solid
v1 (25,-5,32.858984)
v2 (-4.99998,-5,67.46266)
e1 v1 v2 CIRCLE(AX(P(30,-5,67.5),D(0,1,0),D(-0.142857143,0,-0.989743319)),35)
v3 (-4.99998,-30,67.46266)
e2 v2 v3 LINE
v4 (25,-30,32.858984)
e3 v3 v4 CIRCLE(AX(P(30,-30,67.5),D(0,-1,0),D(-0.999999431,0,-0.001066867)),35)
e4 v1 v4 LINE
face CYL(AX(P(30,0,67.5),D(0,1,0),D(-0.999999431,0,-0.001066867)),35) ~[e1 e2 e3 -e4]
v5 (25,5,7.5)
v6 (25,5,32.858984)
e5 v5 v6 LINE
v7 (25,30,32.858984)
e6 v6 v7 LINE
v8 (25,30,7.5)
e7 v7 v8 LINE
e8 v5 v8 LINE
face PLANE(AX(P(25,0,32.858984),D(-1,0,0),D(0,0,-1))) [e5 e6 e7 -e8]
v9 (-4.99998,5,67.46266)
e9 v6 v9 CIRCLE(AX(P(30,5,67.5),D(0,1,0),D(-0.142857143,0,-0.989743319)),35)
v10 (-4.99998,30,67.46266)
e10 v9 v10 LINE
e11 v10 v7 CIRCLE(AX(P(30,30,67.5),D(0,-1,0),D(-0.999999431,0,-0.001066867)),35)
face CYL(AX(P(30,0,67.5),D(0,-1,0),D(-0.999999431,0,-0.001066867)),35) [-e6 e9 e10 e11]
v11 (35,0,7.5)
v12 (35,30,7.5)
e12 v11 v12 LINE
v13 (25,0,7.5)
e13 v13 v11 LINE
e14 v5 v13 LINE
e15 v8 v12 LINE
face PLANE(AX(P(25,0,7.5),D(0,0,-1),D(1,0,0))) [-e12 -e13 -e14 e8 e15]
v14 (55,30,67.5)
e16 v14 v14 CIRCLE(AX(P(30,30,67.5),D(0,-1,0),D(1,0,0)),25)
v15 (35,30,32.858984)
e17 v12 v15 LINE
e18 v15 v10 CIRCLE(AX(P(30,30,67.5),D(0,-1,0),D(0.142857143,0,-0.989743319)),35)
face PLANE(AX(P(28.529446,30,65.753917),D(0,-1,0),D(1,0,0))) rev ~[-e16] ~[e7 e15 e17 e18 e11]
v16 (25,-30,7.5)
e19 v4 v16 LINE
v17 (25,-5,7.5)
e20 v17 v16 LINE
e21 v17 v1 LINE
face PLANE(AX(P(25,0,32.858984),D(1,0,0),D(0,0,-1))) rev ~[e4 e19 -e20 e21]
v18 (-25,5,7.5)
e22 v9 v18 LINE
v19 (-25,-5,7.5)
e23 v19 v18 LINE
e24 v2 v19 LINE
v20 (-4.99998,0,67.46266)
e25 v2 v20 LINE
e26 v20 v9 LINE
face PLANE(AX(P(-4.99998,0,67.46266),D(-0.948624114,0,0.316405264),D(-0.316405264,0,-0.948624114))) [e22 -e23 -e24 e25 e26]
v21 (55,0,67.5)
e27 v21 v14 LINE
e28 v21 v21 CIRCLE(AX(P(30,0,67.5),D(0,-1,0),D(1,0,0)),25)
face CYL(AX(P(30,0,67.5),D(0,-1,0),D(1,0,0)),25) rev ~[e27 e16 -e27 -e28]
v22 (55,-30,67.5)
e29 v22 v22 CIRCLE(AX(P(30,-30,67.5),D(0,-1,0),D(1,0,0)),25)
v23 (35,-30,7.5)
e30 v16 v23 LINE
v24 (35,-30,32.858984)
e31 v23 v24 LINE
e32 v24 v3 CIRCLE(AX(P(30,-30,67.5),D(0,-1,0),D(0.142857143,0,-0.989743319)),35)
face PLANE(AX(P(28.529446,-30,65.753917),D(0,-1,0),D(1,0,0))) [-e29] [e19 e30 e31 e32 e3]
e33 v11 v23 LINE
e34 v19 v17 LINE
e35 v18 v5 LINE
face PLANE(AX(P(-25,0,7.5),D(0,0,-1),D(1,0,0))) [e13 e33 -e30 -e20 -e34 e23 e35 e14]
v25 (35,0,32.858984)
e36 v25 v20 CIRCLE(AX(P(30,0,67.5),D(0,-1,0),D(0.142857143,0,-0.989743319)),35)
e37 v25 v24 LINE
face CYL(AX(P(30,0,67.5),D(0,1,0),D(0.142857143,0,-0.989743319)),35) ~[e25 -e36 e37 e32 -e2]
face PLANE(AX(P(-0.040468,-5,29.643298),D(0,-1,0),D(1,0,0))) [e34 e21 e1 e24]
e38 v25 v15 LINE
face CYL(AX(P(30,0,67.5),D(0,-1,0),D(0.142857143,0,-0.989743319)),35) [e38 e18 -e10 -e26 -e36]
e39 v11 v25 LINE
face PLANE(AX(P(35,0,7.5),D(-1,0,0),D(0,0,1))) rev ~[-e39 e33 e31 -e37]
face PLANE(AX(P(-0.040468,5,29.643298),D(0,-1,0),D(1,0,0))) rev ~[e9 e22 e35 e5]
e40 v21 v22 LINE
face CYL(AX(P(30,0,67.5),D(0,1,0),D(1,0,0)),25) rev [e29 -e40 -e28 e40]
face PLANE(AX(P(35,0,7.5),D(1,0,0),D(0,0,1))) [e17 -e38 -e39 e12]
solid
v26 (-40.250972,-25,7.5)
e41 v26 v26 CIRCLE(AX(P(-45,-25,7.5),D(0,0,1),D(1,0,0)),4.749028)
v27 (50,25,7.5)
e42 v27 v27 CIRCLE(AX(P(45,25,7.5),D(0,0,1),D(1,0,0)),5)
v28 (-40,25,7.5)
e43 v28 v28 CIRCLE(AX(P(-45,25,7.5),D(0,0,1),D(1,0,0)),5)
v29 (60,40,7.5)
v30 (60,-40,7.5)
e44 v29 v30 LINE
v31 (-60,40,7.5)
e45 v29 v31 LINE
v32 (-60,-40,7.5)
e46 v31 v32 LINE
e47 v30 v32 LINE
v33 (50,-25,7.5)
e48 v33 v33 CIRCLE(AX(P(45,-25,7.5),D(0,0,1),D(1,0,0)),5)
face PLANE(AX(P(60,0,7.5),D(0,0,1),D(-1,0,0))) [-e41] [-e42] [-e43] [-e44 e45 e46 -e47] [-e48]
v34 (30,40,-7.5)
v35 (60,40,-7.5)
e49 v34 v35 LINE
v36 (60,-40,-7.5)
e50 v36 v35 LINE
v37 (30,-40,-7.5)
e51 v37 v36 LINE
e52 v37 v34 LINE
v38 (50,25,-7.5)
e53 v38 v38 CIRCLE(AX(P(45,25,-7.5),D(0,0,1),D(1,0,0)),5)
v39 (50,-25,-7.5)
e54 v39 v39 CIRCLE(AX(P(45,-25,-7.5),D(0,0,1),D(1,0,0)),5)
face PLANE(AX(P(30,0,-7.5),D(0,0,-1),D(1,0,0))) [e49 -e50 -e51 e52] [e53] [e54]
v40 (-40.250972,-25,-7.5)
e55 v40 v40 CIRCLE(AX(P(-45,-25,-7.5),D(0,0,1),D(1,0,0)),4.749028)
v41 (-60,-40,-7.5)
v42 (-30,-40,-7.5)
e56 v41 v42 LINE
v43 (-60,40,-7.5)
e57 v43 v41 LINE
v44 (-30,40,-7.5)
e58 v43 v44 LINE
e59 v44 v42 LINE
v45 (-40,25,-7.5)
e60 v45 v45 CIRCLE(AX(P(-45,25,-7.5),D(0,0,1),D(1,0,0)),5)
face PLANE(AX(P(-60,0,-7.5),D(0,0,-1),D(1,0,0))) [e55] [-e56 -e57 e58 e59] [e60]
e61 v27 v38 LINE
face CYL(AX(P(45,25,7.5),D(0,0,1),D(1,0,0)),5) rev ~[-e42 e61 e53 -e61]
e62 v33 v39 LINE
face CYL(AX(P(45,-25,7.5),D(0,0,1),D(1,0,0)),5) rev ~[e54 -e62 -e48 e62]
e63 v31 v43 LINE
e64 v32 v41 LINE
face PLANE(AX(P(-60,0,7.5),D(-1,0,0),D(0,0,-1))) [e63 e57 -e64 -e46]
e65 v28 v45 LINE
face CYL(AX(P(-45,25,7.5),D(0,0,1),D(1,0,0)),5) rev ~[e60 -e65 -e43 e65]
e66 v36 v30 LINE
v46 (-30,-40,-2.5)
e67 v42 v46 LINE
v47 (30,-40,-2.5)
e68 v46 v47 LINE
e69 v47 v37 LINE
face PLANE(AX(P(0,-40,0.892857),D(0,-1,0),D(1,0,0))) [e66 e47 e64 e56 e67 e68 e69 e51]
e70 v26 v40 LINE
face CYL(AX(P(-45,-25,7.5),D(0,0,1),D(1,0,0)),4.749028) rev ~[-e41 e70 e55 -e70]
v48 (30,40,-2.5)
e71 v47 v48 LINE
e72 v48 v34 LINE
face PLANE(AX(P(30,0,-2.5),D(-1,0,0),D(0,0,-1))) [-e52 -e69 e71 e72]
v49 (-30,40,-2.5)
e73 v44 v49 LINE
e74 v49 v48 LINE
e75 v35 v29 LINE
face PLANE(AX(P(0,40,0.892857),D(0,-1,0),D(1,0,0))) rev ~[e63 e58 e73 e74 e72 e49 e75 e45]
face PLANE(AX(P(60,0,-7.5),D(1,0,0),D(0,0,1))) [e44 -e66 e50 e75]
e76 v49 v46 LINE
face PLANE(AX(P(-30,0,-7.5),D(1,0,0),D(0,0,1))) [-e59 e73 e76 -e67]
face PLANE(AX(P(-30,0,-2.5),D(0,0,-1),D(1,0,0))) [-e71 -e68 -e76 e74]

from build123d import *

# Parameters (mm, degrees)
F1_DEPTH      = 40
F1_DEPTH_BACK = 40
F2_DEPTH      = 5
F2_DEPTH_BACK = 5
F0_R          = 25
F3_DEPTH      = 30
F3_DEPTH_BACK = 30
F4_R          = 5
F4_R_2        = 4.7490283211
F5_DEPTH      = 25
F6_R          = 5
F7_DEPTH      = 25


with BuildPart() as f1:
    # F0 (on Front) → F1 (new body, two sides)
    with BuildSketch(Plane.XZ) as f1_sk:
        Polygon((60, -7.5), (60, 7.5), (35, 7.5), (25, 7.5), (-25, 7.5), (-60, 7.5), (-60, -7.5), (-30, -7.5), (-30, -2.5), (30, -2.5), (30, -7.5), align=None)
    extrude(amount=F1_DEPTH)
    extrude(f1_sk.sketch, amount=-F1_DEPTH_BACK)

    # F4 (on face) → F5 (cut)
    with BuildSketch(Plane.XY.offset(7.5)):
        with Locations((-45, 25)):
            Circle(F4_R)
        with Locations((-45, -25)):
            Circle(F4_R_2)
    extrude(amount=-F5_DEPTH, mode=Mode.SUBTRACT)

    # F6 (on face) → F7 (cut)
    with BuildSketch(Plane.XY.offset(7.5)):
        with Locations((45, -25)):
            Circle(F6_R)
        with Locations((45, 25)):
            Circle(F6_R)
    extrude(amount=-F7_DEPTH, mode=Mode.SUBTRACT)


with BuildPart() as f2:
    # F0 (on Front) → F2 (new body, two sides)
    with BuildSketch(Plane.XZ) as f2_sk:
        with BuildLine():
            Line((-25, 7.5), (25, 7.5))
            Line((25, 7.5), (25, 32.8589838486))
            ThreePointArc((25, 32.8589838486), (3.55471315, 44.573011462), (-4.9999800814, 67.462659662))
            Line((-4.9999800814, 67.462659662), (-25, 7.5))
        make_face()
    extrude(amount=F2_DEPTH)
    extrude(f2_sk.sketch, amount=-F2_DEPTH_BACK)

    # F0 (on Front) → F3 (join, two sides)
    with BuildSketch(Plane.XZ) as f3_sk:
        with BuildLine():
            ThreePointArc((25, 32.8589838486), (30, 32.5), (35, 32.8589838486))
            ThreePointArc((35, 32.8589838486), (56.4575131106, 44.5871215252), (65, 67.5))
            ThreePointArc((65, 67.5), (29.9813298283, 102.4999950204), (-4.9999800814, 67.462659662))
            ThreePointArc((-4.9999800814, 67.462659662), (3.55471315, 44.573011462), (25, 32.8589838486))
        make_face()
        with Locations((30, 67.5)):
            Circle(F0_R, mode=Mode.SUBTRACT)
        with BuildLine():
            Line((25, 7.5), (35, 7.5))
            Line((35, 7.5), (35, 32.8589838486))
            ThreePointArc((35, 32.8589838486), (30, 32.5), (25, 32.8589838486))
            Line((25, 32.8589838486), (25, 7.5))
        make_face()
    extrude(amount=F3_DEPTH)
    extrude(f3_sk.sketch, amount=-F3_DEPTH_BACK)


solid = Compound([f1.part, f2.part])
